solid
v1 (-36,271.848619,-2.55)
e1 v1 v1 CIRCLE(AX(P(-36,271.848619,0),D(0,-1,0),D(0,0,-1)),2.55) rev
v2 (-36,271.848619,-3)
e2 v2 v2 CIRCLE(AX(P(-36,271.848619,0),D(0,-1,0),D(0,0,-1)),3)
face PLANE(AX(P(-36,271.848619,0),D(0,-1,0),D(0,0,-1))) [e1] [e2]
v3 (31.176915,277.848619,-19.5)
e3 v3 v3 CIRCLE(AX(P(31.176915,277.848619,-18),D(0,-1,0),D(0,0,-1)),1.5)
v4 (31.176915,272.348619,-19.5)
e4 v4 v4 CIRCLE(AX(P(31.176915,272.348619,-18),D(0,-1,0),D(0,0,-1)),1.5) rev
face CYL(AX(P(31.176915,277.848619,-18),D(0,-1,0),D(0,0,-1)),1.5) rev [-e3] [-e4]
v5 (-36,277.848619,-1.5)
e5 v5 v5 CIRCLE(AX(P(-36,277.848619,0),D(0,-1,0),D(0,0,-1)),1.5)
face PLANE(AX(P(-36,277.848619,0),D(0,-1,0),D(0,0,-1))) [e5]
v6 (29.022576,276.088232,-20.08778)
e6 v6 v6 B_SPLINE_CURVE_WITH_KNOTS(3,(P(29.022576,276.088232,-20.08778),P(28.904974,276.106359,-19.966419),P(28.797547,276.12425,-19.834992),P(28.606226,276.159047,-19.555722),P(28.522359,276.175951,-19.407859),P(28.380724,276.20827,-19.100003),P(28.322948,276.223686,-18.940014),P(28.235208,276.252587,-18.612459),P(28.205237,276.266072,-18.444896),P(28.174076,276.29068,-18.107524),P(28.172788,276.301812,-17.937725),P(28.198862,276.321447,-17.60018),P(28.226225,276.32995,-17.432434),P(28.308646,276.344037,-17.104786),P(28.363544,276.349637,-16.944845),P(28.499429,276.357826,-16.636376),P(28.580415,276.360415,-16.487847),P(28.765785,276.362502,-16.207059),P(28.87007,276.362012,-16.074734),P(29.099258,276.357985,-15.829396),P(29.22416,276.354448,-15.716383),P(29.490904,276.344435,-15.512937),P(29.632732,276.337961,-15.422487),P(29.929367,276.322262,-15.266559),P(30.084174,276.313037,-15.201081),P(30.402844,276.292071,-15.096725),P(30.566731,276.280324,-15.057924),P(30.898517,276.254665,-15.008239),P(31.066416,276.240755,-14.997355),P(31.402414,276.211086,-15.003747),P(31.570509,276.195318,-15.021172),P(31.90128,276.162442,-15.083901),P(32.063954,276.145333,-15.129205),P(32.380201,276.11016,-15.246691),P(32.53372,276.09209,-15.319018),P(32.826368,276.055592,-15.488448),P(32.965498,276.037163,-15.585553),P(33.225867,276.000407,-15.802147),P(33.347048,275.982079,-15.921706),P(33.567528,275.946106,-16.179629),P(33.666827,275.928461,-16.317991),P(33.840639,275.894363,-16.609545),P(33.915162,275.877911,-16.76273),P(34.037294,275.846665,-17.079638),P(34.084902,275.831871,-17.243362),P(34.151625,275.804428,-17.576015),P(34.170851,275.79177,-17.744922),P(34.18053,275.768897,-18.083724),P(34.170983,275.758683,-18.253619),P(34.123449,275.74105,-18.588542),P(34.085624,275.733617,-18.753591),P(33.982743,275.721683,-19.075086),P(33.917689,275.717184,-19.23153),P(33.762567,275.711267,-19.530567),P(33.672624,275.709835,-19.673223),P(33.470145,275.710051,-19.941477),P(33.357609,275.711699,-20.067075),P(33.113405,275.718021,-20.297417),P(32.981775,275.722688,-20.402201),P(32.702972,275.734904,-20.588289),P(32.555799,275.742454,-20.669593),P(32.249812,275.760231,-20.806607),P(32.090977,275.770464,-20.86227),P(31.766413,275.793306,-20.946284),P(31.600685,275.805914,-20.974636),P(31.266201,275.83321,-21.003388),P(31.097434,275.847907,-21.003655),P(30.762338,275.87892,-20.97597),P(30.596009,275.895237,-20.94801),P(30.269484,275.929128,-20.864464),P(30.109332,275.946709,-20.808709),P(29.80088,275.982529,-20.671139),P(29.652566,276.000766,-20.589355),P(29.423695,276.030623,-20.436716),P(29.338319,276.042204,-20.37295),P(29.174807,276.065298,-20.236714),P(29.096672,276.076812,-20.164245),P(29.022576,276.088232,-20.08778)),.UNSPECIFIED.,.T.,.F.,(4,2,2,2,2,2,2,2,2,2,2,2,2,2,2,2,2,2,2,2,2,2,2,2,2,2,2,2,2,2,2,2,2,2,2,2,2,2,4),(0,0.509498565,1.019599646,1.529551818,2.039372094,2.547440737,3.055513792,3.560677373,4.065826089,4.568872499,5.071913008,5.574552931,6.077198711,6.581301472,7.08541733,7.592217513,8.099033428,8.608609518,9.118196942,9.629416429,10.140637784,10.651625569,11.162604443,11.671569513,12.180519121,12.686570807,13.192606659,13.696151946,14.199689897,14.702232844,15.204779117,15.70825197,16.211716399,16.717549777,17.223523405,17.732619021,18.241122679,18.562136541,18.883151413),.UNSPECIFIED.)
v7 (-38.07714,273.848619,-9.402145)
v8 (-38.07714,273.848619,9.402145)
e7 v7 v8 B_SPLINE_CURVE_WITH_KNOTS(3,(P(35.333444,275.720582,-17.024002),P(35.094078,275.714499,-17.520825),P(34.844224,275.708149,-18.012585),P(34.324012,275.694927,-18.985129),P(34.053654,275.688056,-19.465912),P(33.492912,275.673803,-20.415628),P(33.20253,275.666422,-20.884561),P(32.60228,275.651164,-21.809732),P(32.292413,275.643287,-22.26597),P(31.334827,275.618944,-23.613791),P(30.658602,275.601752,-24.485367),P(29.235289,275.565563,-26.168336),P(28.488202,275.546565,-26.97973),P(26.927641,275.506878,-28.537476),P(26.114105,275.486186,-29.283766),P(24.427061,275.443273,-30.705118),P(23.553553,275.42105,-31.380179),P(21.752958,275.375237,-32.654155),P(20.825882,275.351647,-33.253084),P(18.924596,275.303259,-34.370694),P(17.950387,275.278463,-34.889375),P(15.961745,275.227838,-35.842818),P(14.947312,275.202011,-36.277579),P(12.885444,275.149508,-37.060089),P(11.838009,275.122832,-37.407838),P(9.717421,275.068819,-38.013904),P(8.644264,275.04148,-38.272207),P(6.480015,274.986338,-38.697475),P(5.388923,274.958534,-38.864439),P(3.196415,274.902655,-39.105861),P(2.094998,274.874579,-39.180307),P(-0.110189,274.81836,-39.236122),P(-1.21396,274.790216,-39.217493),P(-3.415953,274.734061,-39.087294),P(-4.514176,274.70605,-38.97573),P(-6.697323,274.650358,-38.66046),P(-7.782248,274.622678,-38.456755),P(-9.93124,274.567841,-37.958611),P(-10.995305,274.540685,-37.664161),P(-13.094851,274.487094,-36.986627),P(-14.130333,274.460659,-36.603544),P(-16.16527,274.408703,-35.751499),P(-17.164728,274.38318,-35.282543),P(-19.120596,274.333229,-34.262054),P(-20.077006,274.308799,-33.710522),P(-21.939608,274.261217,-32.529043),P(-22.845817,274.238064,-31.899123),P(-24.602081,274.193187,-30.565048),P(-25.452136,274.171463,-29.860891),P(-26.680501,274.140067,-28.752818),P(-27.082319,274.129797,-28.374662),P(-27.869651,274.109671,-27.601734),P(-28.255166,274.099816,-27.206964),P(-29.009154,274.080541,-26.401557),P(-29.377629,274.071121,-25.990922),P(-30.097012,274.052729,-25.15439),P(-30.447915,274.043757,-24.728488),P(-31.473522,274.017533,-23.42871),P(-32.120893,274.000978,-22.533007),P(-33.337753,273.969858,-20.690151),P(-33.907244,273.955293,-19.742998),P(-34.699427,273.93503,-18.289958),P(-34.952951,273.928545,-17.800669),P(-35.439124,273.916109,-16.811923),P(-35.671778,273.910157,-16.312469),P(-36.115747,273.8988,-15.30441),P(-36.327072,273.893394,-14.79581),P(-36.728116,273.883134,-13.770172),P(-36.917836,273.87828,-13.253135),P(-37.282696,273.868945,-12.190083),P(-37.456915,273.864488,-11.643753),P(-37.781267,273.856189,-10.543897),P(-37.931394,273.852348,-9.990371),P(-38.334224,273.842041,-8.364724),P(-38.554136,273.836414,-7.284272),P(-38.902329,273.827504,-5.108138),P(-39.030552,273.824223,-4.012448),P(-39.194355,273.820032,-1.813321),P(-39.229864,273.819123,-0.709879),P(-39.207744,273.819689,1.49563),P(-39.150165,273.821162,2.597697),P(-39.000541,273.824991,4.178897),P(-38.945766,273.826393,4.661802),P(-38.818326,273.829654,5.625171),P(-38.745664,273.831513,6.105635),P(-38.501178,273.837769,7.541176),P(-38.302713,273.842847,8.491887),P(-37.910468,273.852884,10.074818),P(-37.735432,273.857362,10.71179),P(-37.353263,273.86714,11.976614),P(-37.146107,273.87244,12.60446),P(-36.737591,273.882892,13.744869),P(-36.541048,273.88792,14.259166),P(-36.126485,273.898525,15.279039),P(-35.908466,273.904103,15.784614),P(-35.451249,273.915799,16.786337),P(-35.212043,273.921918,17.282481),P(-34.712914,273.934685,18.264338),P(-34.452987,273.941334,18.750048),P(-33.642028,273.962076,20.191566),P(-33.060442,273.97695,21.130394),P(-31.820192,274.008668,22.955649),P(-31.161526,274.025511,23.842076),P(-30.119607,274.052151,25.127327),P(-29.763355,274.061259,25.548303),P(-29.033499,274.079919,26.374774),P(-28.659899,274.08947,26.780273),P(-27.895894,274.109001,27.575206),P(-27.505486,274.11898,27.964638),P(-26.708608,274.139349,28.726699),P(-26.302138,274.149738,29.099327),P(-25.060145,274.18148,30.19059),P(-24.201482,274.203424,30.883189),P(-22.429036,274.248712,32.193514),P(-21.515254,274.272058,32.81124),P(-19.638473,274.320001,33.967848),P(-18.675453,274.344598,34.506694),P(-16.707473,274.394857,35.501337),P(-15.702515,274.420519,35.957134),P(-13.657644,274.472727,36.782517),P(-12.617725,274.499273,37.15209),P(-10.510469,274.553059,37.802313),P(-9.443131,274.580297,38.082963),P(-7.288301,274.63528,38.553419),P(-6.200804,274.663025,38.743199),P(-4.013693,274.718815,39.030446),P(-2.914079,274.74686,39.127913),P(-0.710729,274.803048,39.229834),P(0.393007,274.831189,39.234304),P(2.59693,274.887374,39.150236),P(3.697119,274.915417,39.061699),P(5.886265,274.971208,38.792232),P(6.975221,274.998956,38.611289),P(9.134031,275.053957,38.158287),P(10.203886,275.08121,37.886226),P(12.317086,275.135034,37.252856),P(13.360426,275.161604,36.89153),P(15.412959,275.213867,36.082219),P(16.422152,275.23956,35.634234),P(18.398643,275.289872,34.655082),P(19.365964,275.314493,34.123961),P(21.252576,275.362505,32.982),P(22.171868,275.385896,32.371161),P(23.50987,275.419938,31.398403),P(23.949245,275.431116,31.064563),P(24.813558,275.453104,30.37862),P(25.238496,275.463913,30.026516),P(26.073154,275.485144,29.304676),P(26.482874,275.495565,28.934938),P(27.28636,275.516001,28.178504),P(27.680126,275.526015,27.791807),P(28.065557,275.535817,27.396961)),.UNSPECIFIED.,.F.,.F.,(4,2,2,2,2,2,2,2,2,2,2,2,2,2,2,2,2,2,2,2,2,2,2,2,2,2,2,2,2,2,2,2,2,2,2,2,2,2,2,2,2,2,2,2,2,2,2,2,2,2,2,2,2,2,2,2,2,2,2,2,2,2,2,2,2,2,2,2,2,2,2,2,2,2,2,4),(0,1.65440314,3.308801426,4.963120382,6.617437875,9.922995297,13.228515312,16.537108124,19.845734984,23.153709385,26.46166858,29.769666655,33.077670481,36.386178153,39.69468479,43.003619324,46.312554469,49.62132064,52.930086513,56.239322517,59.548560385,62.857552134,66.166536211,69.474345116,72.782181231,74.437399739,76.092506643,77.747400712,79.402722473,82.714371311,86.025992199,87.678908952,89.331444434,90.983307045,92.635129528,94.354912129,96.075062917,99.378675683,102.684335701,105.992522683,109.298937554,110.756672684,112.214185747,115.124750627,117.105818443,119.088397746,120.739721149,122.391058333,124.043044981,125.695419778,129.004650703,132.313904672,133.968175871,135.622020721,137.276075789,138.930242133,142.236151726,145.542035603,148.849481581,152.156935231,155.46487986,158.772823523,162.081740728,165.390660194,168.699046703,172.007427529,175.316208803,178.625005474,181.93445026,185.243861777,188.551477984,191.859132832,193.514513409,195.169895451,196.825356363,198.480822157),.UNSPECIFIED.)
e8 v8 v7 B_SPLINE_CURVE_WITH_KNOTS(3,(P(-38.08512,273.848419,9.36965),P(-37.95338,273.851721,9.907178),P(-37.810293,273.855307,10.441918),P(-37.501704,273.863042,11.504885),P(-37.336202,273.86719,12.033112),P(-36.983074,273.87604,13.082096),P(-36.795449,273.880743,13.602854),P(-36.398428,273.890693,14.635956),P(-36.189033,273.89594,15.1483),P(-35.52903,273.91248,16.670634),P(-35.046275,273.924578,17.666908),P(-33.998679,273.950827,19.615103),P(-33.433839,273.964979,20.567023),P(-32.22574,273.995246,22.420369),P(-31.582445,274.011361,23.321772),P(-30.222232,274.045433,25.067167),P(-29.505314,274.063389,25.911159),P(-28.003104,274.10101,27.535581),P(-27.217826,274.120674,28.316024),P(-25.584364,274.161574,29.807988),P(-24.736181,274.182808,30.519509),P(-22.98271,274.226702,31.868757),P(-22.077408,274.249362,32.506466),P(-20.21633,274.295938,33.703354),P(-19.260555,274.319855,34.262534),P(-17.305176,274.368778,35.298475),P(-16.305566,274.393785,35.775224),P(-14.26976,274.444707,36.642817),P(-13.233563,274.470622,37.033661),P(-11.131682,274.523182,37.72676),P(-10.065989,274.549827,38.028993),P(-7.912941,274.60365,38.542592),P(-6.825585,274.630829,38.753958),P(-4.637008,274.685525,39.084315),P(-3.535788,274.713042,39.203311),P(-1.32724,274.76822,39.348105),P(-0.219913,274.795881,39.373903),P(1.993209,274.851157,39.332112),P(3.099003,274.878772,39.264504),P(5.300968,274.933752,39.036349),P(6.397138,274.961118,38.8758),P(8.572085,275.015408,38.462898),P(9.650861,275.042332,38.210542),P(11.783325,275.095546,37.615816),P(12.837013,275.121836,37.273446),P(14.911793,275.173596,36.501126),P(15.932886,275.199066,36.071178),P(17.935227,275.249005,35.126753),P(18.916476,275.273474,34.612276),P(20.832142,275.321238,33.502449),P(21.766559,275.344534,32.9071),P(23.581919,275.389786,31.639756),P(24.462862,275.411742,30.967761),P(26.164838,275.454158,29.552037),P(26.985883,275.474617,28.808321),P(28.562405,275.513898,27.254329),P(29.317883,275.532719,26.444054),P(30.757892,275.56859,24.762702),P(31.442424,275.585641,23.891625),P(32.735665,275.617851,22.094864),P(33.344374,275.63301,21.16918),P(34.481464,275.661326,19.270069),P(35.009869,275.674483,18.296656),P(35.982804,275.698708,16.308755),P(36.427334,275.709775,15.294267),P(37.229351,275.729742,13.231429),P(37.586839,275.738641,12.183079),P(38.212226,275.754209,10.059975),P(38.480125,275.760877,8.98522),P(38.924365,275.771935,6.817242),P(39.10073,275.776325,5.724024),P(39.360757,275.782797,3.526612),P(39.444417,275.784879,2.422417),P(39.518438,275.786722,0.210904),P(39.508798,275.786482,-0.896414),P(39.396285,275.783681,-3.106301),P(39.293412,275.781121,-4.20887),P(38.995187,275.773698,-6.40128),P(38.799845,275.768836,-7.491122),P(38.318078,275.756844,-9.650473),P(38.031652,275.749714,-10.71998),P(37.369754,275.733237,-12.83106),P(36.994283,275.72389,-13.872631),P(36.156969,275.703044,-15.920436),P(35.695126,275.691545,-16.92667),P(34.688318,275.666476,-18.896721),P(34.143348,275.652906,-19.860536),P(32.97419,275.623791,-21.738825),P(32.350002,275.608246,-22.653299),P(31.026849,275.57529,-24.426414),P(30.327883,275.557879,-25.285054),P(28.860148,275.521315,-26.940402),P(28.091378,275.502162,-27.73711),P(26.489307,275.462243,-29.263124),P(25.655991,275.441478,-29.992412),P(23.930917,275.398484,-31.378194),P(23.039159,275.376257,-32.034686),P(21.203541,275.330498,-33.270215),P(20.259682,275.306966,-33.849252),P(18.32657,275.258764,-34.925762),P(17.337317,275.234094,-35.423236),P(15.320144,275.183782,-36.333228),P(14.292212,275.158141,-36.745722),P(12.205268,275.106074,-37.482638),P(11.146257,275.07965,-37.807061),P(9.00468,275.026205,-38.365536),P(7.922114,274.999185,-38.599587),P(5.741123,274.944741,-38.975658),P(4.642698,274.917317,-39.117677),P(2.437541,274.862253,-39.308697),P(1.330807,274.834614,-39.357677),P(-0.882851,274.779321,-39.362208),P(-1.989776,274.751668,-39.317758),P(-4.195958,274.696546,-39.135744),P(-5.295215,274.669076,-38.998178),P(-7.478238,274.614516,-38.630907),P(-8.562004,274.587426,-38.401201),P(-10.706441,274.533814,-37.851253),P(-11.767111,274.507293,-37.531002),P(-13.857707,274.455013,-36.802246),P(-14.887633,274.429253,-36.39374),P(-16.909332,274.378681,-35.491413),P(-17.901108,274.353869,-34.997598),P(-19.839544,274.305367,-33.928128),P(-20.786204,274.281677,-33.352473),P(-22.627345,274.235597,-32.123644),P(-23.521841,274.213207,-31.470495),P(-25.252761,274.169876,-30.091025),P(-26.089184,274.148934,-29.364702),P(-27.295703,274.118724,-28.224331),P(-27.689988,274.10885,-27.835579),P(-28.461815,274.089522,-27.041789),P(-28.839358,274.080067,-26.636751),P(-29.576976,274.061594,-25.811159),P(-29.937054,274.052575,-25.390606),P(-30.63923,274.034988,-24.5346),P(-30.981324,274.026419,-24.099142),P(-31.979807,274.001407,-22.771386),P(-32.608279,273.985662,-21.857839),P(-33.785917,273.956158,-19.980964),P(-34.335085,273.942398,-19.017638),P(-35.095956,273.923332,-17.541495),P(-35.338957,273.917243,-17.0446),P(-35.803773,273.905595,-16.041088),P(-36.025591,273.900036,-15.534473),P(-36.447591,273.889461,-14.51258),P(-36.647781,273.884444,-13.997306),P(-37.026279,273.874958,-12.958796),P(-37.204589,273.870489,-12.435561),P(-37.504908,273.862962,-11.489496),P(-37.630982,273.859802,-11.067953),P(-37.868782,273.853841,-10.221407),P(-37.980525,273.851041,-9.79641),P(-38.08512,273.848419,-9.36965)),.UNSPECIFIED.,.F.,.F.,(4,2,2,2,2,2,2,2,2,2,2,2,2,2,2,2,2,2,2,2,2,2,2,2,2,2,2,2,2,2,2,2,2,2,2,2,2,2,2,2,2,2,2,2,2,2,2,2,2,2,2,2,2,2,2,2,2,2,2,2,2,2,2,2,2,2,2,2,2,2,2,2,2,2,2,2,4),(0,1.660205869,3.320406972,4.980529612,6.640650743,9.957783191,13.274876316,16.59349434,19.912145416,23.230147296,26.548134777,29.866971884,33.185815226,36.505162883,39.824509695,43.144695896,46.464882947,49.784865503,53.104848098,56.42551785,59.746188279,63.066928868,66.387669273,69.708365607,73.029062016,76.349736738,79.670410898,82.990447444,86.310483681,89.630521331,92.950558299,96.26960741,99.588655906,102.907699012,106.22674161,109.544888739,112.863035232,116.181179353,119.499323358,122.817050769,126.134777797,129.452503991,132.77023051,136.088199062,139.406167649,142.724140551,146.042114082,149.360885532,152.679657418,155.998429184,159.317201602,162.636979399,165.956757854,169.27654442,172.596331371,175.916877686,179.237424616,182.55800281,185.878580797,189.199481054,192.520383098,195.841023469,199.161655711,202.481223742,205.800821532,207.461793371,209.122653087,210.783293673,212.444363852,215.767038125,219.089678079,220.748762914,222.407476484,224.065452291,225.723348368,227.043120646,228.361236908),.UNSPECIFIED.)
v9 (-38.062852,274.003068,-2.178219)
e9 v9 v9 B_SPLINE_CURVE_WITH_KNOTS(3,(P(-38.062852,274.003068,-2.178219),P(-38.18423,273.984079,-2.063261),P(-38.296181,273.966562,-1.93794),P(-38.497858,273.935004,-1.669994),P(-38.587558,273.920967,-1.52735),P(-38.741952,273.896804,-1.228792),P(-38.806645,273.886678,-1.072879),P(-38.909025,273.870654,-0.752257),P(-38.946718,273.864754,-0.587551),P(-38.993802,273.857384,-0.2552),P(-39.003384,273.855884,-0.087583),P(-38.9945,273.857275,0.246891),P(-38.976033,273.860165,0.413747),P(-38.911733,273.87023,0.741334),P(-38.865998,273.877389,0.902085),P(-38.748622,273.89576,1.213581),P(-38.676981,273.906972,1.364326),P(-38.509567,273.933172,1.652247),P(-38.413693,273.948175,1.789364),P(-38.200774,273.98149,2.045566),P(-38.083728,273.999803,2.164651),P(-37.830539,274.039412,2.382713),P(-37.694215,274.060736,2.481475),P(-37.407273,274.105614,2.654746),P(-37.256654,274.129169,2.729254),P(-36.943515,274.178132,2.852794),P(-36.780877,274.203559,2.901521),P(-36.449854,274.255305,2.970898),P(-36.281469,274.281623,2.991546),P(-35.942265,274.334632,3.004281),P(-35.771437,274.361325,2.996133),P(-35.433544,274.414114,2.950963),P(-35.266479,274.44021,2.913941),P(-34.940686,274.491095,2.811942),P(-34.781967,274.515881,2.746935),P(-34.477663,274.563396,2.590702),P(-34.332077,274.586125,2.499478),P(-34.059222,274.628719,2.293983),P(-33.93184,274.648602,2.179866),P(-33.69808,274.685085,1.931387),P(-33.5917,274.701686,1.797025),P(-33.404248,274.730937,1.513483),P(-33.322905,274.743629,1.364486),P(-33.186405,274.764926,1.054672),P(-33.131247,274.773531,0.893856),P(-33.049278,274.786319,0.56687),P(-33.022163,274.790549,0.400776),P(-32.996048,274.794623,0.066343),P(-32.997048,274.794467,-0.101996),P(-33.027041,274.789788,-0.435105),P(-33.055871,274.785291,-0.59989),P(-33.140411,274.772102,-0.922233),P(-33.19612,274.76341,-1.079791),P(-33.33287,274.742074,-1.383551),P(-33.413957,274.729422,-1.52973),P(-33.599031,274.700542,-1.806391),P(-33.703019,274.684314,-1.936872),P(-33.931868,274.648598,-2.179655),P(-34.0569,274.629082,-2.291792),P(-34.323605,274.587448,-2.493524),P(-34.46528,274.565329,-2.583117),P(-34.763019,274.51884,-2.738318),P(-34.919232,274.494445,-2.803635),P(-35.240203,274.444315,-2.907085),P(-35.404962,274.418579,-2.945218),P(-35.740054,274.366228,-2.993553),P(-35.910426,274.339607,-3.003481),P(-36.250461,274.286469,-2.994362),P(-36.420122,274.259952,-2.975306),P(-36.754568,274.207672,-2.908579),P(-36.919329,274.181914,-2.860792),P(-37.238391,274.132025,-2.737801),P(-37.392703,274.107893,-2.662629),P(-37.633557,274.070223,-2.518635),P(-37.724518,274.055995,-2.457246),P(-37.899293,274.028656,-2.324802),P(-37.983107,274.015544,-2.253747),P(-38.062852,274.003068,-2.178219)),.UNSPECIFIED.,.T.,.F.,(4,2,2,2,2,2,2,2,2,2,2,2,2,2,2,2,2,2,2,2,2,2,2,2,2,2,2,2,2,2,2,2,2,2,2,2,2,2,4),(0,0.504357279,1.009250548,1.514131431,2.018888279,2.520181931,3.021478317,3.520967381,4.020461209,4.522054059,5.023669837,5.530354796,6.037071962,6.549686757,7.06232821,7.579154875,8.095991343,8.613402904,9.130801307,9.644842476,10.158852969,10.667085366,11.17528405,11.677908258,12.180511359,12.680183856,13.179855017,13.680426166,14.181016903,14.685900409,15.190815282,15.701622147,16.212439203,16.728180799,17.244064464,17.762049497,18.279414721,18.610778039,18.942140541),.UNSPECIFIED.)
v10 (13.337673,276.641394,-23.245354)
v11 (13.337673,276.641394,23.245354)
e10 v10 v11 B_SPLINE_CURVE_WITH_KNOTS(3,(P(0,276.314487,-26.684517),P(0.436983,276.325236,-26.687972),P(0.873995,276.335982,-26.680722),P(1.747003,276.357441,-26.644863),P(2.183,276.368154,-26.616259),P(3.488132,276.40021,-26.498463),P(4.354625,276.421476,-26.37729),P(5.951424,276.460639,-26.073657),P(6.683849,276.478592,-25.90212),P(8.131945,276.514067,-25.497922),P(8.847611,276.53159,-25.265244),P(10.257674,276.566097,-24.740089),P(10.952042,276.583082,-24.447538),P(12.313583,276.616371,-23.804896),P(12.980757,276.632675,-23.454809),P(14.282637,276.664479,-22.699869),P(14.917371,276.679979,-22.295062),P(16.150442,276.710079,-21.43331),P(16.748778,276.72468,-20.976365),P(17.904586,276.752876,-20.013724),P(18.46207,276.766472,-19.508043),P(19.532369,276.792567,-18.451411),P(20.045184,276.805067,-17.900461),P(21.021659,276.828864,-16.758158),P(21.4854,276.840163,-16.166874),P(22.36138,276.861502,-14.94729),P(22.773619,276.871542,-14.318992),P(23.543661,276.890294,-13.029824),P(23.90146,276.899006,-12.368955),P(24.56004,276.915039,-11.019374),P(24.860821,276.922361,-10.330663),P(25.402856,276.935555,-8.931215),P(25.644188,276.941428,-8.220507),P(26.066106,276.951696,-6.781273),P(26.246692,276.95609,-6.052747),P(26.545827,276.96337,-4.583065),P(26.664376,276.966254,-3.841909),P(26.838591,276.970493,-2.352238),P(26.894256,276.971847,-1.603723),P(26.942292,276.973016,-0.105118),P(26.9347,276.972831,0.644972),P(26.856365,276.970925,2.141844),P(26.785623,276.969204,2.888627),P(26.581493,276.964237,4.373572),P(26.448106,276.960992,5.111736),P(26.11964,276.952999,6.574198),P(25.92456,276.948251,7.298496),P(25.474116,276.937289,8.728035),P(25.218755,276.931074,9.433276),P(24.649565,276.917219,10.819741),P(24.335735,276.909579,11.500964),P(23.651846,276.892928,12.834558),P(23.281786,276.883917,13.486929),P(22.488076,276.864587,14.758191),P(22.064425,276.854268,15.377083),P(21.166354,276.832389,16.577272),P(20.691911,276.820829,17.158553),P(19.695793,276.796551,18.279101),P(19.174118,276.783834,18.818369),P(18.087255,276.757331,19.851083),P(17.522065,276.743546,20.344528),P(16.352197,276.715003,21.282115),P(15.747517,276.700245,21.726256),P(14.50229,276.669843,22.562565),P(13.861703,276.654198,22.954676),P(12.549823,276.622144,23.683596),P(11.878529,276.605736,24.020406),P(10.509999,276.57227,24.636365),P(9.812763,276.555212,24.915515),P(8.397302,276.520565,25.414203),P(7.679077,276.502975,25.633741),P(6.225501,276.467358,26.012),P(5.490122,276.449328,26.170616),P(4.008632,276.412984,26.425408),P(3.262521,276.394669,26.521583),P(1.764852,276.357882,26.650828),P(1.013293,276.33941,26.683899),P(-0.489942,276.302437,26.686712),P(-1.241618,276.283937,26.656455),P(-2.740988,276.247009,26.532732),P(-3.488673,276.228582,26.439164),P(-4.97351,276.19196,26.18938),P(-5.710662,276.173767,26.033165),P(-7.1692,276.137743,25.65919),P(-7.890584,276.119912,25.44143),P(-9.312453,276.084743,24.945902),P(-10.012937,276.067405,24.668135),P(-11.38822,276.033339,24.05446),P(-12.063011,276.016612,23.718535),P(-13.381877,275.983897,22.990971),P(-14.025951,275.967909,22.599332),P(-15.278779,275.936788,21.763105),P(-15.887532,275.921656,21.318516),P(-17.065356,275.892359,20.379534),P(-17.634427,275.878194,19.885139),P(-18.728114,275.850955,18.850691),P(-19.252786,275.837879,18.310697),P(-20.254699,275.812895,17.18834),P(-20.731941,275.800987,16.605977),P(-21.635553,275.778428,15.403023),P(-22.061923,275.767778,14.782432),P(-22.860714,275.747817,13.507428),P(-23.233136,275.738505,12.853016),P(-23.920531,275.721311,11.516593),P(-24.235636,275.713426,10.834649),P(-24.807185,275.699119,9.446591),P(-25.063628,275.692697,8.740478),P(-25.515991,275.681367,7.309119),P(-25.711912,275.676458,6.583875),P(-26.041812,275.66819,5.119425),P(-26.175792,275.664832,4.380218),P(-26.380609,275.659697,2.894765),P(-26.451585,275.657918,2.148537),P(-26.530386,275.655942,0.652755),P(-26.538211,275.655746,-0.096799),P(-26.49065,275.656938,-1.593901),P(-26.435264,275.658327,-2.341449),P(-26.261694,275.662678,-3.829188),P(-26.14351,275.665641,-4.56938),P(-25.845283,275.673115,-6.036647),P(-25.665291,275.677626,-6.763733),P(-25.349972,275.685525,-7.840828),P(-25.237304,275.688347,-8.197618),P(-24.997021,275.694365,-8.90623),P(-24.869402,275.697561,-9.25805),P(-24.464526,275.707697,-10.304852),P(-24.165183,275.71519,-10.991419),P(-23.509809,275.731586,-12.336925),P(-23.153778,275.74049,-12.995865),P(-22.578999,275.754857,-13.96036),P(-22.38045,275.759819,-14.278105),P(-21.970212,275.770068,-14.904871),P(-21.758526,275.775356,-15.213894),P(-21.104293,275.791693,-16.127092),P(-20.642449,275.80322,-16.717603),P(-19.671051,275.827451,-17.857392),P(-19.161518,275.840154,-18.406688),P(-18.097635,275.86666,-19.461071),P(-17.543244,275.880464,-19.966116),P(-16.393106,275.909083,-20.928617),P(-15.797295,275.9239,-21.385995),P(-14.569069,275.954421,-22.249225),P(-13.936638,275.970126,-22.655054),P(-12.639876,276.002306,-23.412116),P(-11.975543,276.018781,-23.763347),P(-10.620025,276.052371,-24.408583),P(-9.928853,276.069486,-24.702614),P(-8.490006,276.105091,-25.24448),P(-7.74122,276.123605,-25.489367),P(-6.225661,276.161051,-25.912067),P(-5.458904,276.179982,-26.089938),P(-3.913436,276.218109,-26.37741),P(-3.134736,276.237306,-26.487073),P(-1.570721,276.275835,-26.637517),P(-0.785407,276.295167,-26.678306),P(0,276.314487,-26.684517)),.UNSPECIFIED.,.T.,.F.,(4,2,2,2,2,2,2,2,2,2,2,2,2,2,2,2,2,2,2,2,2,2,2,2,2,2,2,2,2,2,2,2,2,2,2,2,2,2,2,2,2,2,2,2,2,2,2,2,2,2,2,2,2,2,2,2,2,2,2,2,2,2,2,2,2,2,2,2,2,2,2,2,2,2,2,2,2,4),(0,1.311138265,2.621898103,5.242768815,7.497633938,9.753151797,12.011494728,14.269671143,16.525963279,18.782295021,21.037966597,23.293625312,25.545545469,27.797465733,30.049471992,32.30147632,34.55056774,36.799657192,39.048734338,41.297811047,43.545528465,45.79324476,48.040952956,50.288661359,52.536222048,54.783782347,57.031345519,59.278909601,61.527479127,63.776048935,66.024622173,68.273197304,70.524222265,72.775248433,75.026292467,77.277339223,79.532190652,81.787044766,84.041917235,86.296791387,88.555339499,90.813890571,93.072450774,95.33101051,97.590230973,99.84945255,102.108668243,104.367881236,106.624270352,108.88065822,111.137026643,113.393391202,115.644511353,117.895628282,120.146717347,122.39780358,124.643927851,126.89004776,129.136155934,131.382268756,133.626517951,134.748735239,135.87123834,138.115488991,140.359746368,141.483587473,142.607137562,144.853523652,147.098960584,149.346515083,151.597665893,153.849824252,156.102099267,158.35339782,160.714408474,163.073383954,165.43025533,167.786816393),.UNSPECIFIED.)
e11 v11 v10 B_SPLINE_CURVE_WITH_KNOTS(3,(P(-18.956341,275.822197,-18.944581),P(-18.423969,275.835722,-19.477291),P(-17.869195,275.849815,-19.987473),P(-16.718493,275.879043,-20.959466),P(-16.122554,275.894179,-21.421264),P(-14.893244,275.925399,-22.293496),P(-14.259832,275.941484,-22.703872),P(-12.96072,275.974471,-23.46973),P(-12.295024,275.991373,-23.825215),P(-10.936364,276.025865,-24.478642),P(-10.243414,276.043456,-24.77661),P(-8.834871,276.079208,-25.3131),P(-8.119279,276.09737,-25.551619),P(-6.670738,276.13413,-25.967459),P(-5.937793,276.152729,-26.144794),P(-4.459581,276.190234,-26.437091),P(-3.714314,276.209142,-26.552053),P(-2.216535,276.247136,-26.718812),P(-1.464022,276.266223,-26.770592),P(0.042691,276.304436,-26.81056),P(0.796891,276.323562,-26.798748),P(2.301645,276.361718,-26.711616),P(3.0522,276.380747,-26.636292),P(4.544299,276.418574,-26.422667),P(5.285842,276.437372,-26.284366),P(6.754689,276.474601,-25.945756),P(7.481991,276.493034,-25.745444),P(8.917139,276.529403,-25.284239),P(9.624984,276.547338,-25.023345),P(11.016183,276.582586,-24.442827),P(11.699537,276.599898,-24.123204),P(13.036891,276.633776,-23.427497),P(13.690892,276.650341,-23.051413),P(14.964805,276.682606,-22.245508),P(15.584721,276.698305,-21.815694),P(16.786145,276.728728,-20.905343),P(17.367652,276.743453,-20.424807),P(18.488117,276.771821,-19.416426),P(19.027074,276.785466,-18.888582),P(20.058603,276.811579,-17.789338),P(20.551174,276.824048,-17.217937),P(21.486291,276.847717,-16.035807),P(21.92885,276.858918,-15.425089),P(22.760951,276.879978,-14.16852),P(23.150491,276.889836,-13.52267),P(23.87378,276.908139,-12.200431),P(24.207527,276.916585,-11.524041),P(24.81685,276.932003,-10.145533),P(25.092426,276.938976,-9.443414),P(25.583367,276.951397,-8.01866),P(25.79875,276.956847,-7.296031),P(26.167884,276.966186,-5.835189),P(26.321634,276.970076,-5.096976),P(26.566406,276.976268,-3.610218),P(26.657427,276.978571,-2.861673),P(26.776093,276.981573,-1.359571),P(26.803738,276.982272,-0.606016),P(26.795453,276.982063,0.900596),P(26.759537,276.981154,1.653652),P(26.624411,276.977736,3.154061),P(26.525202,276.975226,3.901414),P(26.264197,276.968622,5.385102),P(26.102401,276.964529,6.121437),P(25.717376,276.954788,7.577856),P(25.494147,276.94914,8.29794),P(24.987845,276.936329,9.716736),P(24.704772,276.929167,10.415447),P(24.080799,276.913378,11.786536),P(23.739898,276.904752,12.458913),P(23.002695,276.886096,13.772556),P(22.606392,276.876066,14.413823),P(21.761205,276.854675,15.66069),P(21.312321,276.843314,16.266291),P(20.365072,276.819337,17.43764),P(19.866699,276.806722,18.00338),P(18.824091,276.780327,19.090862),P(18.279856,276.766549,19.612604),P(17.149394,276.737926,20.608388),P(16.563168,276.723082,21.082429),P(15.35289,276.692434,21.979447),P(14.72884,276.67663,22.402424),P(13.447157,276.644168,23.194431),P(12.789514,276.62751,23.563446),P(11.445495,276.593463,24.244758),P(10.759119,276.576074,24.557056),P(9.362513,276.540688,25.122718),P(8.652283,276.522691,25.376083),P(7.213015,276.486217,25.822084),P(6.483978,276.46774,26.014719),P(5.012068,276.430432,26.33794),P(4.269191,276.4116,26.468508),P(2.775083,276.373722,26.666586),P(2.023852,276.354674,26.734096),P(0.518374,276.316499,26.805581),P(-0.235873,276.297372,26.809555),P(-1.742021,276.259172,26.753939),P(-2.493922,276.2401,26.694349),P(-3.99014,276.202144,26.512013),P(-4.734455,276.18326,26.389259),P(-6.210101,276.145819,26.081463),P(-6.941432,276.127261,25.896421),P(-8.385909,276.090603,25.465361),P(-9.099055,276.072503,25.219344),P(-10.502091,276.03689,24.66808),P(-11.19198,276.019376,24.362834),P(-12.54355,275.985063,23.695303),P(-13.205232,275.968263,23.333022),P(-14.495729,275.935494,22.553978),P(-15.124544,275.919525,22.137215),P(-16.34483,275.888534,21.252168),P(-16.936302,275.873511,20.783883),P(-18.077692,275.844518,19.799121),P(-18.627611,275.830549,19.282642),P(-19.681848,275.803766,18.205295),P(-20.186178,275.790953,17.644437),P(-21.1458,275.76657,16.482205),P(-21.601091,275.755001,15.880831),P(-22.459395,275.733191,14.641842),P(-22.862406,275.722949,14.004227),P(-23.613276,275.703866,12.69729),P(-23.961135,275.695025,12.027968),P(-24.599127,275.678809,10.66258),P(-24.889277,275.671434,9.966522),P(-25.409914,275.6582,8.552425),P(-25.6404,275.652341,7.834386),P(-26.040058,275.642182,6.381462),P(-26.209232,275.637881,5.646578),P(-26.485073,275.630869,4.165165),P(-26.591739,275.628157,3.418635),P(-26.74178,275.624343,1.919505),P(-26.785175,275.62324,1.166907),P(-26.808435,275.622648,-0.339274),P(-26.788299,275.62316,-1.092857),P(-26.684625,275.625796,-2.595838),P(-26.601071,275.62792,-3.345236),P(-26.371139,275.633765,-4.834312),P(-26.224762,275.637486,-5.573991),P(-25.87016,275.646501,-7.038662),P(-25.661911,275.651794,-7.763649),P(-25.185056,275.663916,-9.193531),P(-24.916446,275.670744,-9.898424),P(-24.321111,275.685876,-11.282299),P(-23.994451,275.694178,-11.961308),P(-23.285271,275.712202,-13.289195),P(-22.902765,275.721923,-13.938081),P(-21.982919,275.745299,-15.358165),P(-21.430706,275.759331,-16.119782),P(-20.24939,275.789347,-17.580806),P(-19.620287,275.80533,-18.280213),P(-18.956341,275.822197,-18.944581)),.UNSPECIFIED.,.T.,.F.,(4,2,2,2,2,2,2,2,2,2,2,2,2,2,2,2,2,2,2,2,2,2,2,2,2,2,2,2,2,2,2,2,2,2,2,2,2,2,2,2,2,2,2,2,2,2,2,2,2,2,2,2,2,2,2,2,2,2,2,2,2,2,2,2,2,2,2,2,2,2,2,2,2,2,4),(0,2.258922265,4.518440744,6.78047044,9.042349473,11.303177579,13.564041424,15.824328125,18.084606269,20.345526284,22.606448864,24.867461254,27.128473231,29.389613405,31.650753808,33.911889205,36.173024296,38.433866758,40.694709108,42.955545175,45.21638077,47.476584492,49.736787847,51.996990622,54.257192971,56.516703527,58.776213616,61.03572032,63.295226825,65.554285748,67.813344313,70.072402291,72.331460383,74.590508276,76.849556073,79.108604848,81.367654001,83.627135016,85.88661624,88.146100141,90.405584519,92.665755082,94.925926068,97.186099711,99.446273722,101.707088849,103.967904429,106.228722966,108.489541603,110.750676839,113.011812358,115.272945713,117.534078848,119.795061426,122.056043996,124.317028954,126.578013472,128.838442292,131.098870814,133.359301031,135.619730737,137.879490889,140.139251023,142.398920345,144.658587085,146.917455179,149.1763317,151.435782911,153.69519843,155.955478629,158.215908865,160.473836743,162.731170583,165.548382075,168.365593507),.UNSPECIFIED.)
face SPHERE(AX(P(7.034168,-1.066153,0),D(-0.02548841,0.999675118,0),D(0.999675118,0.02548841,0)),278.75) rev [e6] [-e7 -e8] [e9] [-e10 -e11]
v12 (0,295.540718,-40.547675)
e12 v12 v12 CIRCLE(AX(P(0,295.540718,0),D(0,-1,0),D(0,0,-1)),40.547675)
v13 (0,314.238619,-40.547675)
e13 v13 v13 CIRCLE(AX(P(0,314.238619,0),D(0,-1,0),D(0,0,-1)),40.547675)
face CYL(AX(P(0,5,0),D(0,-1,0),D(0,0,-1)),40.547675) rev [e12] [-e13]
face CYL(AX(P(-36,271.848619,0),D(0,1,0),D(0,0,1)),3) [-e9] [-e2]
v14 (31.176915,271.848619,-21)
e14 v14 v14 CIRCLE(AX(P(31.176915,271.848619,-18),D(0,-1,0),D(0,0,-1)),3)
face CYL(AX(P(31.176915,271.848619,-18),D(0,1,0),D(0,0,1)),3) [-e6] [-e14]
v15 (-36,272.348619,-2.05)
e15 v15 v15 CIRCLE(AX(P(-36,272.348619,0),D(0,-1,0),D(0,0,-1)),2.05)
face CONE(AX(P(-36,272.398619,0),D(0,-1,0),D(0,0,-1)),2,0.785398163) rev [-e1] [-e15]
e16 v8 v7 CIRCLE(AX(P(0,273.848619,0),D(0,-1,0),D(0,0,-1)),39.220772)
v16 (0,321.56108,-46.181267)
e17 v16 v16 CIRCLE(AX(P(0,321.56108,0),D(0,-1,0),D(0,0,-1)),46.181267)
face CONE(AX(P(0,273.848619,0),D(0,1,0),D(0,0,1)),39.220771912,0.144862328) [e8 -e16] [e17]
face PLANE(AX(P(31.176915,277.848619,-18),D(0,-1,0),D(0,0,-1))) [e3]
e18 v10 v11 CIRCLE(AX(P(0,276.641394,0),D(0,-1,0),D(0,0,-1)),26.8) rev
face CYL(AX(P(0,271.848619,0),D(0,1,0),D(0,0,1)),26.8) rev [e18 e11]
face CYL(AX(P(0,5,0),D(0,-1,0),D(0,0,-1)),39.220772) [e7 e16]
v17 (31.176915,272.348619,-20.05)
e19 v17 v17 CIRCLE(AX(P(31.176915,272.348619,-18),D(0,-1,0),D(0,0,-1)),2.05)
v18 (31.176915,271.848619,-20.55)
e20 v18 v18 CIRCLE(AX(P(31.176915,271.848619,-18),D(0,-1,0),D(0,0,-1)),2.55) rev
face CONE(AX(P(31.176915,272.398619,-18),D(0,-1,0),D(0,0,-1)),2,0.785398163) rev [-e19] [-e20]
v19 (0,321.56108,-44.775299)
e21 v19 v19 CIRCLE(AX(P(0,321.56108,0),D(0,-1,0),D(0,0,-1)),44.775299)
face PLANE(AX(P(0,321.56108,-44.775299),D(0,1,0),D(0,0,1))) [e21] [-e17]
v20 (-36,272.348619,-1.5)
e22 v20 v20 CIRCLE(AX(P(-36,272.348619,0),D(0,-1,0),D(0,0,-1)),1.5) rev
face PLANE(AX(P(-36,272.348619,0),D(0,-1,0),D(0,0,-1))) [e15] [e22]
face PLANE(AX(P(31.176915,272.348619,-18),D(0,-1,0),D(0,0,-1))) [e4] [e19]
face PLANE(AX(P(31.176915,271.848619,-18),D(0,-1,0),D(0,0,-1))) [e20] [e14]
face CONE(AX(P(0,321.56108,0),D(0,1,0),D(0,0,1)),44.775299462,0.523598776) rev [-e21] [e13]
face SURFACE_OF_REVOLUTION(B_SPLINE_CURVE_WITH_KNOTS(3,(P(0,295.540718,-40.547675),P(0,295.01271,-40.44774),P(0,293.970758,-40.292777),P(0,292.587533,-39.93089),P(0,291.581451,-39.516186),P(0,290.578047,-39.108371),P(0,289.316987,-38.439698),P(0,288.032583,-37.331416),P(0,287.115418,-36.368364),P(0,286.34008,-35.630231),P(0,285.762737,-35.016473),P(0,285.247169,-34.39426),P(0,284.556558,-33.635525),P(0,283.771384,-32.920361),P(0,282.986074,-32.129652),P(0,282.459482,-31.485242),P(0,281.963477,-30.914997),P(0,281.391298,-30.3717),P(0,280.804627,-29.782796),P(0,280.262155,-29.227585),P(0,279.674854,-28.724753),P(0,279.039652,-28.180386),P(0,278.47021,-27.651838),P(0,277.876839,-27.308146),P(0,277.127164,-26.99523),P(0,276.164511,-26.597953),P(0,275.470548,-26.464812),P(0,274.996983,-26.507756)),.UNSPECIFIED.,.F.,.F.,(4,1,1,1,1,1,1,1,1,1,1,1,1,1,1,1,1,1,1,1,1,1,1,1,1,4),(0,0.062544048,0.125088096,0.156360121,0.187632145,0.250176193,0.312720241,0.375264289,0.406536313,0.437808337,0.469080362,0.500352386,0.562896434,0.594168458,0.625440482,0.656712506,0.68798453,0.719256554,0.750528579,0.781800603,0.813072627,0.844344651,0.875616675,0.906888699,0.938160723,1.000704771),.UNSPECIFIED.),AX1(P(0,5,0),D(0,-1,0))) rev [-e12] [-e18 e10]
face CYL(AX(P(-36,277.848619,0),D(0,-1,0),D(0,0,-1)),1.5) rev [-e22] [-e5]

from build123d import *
from OCP.BRepAlgoAPI import BRepAlgoAPI_Cut
from OCP.TopTools import TopTools_ListOfShape

# Parameters (mm, degrees)
SKETCH4_R                       = 3
BOSS_EXTRUDE1_DEPTH             = 2
BOSS_EXTRUDE3_REACH             = 82.882
BOSS_EXTRUDE3_END_RADIUS        = 278.75
SKETCH4_3_R                     = 3
BOSS_EXTRUDE3_DIRECTION_2_DEPTH = 2
SKETCH15_R                      = 1.5
CUT_EXTRUDE3_DEPTH              = 6
SKETCH16_R                      = 2
CUT_EXTRUDE4_DEPTH              = 0.5
CHAMFER3_SIZE                   = 0.55
SKETCH17_R                      = 26.8
CUT_EXTRUDE5_DEPTH              = 83.077692853


with BuildPart() as part:
    # Sketch2 → Revolve6 (revolve)
    with BuildSketch(Plane(origin=(0, 0, 0), x_dir=(0, 0, -1), z_dir=(1, 0, 0))):
        with BuildLine():
            Line((26.5077562, 274.996982717), (26.5077562, 273.848618937))
            Line((26.5077562, 273.848618937), (39.220771912, 273.848618937))
            Line((39.220771912, 273.848618937), (46.181267187, 321.561079724))
            Line((46.181267187, 321.561079724), (44.775299462, 321.561079724))
            Line((44.775299462, 321.561079724), (40.547674755, 314.238618937))
            Line((40.547674755, 314.238618937), (40.547674755, 295.540718438))
            add(Edge.make_bspline(
                [(40.547674755, 295.540718438), (40.447740466, 295.012709616), (40.292777353, 293.970757619), (39.930889755, 292.587532753), (39.516186416, 291.581451359), (39.108370782, 290.57804728), (38.439698054, 289.316986818), (37.331416086, 288.032583079), (36.368363881, 287.115418474), (35.630231264, 286.340079673), (35.016472726, 285.762737126), (34.394259795, 285.247169223), (33.635524662, 284.556557999), (32.920361334, 283.771384038), (32.129651901, 282.986073936), (31.485241784, 282.459482323), (30.914997208, 281.963476573), (30.371700346, 281.391298159), (29.782796159, 280.80462685), (29.227584581, 280.262154528), (28.724752618, 279.674853681), (28.180386253, 279.039651715), (27.651838315, 278.470209992), (27.308145935, 277.876839187), (26.995230081, 277.127164256), (26.597952618, 276.164510632), (26.464811583, 275.470548141), (26.5077562, 274.996982717)],
                knots=[0, 0, 0, 0, 0.062544048, 0.125088096, 0.156360121, 0.187632145, 0.250176193, 0.312720241, 0.375264289, 0.406536313, 0.437808337, 0.469080362, 0.500352386, 0.562896434, 0.594168458, 0.625440482, 0.656712506, 0.68798453, 0.719256554, 0.750528579, 0.781800603, 0.813072627, 0.844344651, 0.875616675, 0.906888699, 0.938160723, 1.000704771, 1.000704771, 1.000704771, 1.000704771], degree=3))
        make_face()
    revolve(axis=Axis((0, 5, 0), (0, 1, 0)))

    # Sketch4 → Boss-Extrude1 (add)
    with BuildSketch(Plane.XZ.offset(-273.848618937)):
        with Locations(Location((-36, 0, 0), (0, 0, 270))):
            Circle(SKETCH4_R)
        with Locations(Location((31.176914536, -18, 0), (0, 0, 270))):
            Circle(SKETCH4_R)
    extrude(amount=BOSS_EXTRUDE1_DEPTH)

    # Sketch7 → Revolve7 (revolve)
    with BuildSketch(Plane(origin=(0, 0, 0), x_dir=(0, 0, -1), z_dir=(1, 0, 0))):
        with BuildLine():
            Line((39.220771912, 273.848618937), (39.220771912, 272.319355593))
            ThreePointArc((39.220771912, 272.319355593), (32.873157949, 273.157923648), (26.5077562, 273.848618937))
            Line((26.5077562, 273.848618937), (26.5077562, 274.348618937))
            Line((26.5077562, 274.348618937), (39.220771912, 274.348618937))
            Line((39.220771912, 274.348618937), (39.220771912, 273.848618937))
        make_face()
    revolve(axis=Axis((0, 5, 0), (0, 1, 0)))


with BuildPart() as cut_revolve6_tool:
    # Sketch13 → Cut-Revolve6 (revolve)
    with BuildSketch(Plane.XY):
        with BuildLine():
            Line((39.220771912, 265.819355593), (19.220771912, 265.819355593))
            Line((19.220771912, 265.819355593), (19.220771912, 277.417327684))
            ThreePointArc((19.220771912, 277.417327684), (30.741102516, 276.673911793), (42.220771912, 275.454126993))
            Line((42.220771912, 275.454126993), (42.220771912, 265.819355593))
            Line((42.220771912, 265.819355593), (39.220771912, 265.819355593))
        make_face()
    revolve(axis=Axis((0, 274.819355593, 0), (0.025488410068669705, -0.9996751177018318, 0)))


with BuildPart() as part_1:
    add(part.part)

    # Cut-Revolve6: cut by cut_revolve6_tool, with a tolerance
    cut_revolve6_stock = TopTools_ListOfShape()
    cut_revolve6_stock.Append(part_1.part.wrapped)
    cut_revolve6_tools = TopTools_ListOfShape()
    cut_revolve6_tools.Append(cut_revolve6_tool.part.wrapped)
    cut_revolve6_cut = BRepAlgoAPI_Cut()
    cut_revolve6_cut.SetArguments(cut_revolve6_stock)
    cut_revolve6_cut.SetTools(cut_revolve6_tools)
    cut_revolve6_cut.SetFuzzyValue(0.00001)
    cut_revolve6_cut.Build()
    add(Compound.cast(cut_revolve6_cut.Shape()).solids(), mode=Mode.REPLACE)

    # Boss-Extrude3: up to this sphere (the profile starts inside it)
    boss_extrude3_end = Location((7.03416826, -1.066153319, 0)) * Sphere(BOSS_EXTRUDE3_END_RADIUS, mode=Mode.PRIVATE)
    # Sketch4<3> → Boss-Extrude3 (add, up to the surface)
    with BuildSketch(Plane.XZ.offset(-273.848618937), mode=Mode.PRIVATE) as boss_extrude3_sk1:
        with Locations(Location((-36, 0, 0), (0, 0, 226.558195767))):
            Circle(SKETCH4_3_R)
    boss_extrude3_tool1 = extrude(boss_extrude3_sk1.sketch, amount=-BOSS_EXTRUDE3_REACH, mode=Mode.PRIVATE) & boss_extrude3_end
    add(boss_extrude3_tool1.solids().sort_by_distance((-36, 273.848619, 0))[0])
    # Sketch4<3> → Boss-Extrude3 (add, up to the surface)
    with BuildSketch(Plane.XZ.offset(-273.848618937), mode=Mode.PRIVATE) as boss_extrude3_sk2:
        with Locations(Location((31.176914536, -18, 0), (0, 0, 224.101104304))):
            Circle(SKETCH4_3_R)
    boss_extrude3_tool2 = extrude(boss_extrude3_sk2.sketch, amount=-BOSS_EXTRUDE3_REACH, mode=Mode.PRIVATE) & boss_extrude3_end
    add(boss_extrude3_tool2.solids().sort_by_distance((31.176915, 273.848619, -18))[0])

    # Sketch4<3> → Boss-Extrude3 direction 2 (add)
    with BuildSketch(Plane.XZ.offset(-273.848618937)):
        with Locations(Location((-36, 0, 0), (0, 0, 226.558195767))):
            Circle(SKETCH4_3_R)
        with Locations(Location((31.176914536, -18, 0), (0, 0, 224.101104304))):
            Circle(SKETCH4_3_R)
    extrude(amount=BOSS_EXTRUDE3_DIRECTION_2_DEPTH)

    # Sketch15 → Cut-Extrude3 (cut)
    with BuildSketch(Plane.XZ.offset(-271.848618937)):
        with Locations(Location((-36, 0, 0), (0, 0, 270))):
            Circle(SKETCH15_R)
        with Locations(Location((31.176914536, -18, 0), (0, 0, 270))):
            Circle(SKETCH15_R)
    extrude(amount=-CUT_EXTRUDE3_DEPTH, mode=Mode.SUBTRACT)

    # Sketch16 → Cut-Extrude4 (cut)
    with BuildSketch(Plane.XZ.offset(-271.848618937)):
        with Locations(Location((-36, 0, 0), (0, 0, 270))):
            Circle(SKETCH16_R)
        with Locations(Location((31.176914536, -18, 0), (0, 0, 270))):
            Circle(SKETCH16_R)
    extrude(amount=-CUT_EXTRUDE4_DEPTH, mode=Mode.SUBTRACT)

    # Chamfer3
    # the kernel refuses this chamfer: 0.55 mm, written as the material it takes off along each edge
    with BuildSketch(Plane(origin=(-36, 271.848618937, 0), x_dir=(0, 0, -1), z_dir=(-1, 0, 0))) as chamfer3_piece_1_section:
        Polygon((2 + CHAMFER3_SIZE, 0), (2, -CHAMFER3_SIZE), (2, 0), align=None)
    chamfer3_piece_1 = revolve(axis=Axis((-36, 271.848618937, 0), (0, -1, 0)), mode=Mode.PRIVATE)
    chamfer3_piece_1 = split(chamfer3_piece_1, bisect_by=Plane(origin=(-36, 272.348618937, 0), z_dir=(0, -1, 0)), keep=Keep.TOP, mode=Mode.PRIVATE)
    add(chamfer3_piece_1, mode=Mode.SUBTRACT)
    with BuildSketch(Plane(origin=(31.176914536, 271.848618937, -18), x_dir=(0, 0, -1), z_dir=(-1, 0, 0))) as chamfer3_piece_2_section:
        Polygon((2 + CHAMFER3_SIZE, 0), (2, -CHAMFER3_SIZE), (2, 0), align=None)
    chamfer3_piece_2 = revolve(axis=Axis((31.176914536, 271.848618937, -18), (0, -1, 0)), mode=Mode.PRIVATE)
    chamfer3_piece_2 = split(chamfer3_piece_2, bisect_by=Plane(origin=(31.176914536, 272.348618937, -18), z_dir=(0, -1, 0)), keep=Keep.TOP, mode=Mode.PRIVATE)
    add(chamfer3_piece_2, mode=Mode.SUBTRACT)

    # Sketch17 → Cut-Extrude5 (cut, through all)
    with BuildSketch(Plane(origin=(0, 321.561079724, 0), x_dir=(1, 0, 0), z_dir=(0, 1, 0))):
        Circle(SKETCH17_R)
    extrude(amount=-CUT_EXTRUDE5_DEPTH, mode=Mode.SUBTRACT)


solid = part_1.part
